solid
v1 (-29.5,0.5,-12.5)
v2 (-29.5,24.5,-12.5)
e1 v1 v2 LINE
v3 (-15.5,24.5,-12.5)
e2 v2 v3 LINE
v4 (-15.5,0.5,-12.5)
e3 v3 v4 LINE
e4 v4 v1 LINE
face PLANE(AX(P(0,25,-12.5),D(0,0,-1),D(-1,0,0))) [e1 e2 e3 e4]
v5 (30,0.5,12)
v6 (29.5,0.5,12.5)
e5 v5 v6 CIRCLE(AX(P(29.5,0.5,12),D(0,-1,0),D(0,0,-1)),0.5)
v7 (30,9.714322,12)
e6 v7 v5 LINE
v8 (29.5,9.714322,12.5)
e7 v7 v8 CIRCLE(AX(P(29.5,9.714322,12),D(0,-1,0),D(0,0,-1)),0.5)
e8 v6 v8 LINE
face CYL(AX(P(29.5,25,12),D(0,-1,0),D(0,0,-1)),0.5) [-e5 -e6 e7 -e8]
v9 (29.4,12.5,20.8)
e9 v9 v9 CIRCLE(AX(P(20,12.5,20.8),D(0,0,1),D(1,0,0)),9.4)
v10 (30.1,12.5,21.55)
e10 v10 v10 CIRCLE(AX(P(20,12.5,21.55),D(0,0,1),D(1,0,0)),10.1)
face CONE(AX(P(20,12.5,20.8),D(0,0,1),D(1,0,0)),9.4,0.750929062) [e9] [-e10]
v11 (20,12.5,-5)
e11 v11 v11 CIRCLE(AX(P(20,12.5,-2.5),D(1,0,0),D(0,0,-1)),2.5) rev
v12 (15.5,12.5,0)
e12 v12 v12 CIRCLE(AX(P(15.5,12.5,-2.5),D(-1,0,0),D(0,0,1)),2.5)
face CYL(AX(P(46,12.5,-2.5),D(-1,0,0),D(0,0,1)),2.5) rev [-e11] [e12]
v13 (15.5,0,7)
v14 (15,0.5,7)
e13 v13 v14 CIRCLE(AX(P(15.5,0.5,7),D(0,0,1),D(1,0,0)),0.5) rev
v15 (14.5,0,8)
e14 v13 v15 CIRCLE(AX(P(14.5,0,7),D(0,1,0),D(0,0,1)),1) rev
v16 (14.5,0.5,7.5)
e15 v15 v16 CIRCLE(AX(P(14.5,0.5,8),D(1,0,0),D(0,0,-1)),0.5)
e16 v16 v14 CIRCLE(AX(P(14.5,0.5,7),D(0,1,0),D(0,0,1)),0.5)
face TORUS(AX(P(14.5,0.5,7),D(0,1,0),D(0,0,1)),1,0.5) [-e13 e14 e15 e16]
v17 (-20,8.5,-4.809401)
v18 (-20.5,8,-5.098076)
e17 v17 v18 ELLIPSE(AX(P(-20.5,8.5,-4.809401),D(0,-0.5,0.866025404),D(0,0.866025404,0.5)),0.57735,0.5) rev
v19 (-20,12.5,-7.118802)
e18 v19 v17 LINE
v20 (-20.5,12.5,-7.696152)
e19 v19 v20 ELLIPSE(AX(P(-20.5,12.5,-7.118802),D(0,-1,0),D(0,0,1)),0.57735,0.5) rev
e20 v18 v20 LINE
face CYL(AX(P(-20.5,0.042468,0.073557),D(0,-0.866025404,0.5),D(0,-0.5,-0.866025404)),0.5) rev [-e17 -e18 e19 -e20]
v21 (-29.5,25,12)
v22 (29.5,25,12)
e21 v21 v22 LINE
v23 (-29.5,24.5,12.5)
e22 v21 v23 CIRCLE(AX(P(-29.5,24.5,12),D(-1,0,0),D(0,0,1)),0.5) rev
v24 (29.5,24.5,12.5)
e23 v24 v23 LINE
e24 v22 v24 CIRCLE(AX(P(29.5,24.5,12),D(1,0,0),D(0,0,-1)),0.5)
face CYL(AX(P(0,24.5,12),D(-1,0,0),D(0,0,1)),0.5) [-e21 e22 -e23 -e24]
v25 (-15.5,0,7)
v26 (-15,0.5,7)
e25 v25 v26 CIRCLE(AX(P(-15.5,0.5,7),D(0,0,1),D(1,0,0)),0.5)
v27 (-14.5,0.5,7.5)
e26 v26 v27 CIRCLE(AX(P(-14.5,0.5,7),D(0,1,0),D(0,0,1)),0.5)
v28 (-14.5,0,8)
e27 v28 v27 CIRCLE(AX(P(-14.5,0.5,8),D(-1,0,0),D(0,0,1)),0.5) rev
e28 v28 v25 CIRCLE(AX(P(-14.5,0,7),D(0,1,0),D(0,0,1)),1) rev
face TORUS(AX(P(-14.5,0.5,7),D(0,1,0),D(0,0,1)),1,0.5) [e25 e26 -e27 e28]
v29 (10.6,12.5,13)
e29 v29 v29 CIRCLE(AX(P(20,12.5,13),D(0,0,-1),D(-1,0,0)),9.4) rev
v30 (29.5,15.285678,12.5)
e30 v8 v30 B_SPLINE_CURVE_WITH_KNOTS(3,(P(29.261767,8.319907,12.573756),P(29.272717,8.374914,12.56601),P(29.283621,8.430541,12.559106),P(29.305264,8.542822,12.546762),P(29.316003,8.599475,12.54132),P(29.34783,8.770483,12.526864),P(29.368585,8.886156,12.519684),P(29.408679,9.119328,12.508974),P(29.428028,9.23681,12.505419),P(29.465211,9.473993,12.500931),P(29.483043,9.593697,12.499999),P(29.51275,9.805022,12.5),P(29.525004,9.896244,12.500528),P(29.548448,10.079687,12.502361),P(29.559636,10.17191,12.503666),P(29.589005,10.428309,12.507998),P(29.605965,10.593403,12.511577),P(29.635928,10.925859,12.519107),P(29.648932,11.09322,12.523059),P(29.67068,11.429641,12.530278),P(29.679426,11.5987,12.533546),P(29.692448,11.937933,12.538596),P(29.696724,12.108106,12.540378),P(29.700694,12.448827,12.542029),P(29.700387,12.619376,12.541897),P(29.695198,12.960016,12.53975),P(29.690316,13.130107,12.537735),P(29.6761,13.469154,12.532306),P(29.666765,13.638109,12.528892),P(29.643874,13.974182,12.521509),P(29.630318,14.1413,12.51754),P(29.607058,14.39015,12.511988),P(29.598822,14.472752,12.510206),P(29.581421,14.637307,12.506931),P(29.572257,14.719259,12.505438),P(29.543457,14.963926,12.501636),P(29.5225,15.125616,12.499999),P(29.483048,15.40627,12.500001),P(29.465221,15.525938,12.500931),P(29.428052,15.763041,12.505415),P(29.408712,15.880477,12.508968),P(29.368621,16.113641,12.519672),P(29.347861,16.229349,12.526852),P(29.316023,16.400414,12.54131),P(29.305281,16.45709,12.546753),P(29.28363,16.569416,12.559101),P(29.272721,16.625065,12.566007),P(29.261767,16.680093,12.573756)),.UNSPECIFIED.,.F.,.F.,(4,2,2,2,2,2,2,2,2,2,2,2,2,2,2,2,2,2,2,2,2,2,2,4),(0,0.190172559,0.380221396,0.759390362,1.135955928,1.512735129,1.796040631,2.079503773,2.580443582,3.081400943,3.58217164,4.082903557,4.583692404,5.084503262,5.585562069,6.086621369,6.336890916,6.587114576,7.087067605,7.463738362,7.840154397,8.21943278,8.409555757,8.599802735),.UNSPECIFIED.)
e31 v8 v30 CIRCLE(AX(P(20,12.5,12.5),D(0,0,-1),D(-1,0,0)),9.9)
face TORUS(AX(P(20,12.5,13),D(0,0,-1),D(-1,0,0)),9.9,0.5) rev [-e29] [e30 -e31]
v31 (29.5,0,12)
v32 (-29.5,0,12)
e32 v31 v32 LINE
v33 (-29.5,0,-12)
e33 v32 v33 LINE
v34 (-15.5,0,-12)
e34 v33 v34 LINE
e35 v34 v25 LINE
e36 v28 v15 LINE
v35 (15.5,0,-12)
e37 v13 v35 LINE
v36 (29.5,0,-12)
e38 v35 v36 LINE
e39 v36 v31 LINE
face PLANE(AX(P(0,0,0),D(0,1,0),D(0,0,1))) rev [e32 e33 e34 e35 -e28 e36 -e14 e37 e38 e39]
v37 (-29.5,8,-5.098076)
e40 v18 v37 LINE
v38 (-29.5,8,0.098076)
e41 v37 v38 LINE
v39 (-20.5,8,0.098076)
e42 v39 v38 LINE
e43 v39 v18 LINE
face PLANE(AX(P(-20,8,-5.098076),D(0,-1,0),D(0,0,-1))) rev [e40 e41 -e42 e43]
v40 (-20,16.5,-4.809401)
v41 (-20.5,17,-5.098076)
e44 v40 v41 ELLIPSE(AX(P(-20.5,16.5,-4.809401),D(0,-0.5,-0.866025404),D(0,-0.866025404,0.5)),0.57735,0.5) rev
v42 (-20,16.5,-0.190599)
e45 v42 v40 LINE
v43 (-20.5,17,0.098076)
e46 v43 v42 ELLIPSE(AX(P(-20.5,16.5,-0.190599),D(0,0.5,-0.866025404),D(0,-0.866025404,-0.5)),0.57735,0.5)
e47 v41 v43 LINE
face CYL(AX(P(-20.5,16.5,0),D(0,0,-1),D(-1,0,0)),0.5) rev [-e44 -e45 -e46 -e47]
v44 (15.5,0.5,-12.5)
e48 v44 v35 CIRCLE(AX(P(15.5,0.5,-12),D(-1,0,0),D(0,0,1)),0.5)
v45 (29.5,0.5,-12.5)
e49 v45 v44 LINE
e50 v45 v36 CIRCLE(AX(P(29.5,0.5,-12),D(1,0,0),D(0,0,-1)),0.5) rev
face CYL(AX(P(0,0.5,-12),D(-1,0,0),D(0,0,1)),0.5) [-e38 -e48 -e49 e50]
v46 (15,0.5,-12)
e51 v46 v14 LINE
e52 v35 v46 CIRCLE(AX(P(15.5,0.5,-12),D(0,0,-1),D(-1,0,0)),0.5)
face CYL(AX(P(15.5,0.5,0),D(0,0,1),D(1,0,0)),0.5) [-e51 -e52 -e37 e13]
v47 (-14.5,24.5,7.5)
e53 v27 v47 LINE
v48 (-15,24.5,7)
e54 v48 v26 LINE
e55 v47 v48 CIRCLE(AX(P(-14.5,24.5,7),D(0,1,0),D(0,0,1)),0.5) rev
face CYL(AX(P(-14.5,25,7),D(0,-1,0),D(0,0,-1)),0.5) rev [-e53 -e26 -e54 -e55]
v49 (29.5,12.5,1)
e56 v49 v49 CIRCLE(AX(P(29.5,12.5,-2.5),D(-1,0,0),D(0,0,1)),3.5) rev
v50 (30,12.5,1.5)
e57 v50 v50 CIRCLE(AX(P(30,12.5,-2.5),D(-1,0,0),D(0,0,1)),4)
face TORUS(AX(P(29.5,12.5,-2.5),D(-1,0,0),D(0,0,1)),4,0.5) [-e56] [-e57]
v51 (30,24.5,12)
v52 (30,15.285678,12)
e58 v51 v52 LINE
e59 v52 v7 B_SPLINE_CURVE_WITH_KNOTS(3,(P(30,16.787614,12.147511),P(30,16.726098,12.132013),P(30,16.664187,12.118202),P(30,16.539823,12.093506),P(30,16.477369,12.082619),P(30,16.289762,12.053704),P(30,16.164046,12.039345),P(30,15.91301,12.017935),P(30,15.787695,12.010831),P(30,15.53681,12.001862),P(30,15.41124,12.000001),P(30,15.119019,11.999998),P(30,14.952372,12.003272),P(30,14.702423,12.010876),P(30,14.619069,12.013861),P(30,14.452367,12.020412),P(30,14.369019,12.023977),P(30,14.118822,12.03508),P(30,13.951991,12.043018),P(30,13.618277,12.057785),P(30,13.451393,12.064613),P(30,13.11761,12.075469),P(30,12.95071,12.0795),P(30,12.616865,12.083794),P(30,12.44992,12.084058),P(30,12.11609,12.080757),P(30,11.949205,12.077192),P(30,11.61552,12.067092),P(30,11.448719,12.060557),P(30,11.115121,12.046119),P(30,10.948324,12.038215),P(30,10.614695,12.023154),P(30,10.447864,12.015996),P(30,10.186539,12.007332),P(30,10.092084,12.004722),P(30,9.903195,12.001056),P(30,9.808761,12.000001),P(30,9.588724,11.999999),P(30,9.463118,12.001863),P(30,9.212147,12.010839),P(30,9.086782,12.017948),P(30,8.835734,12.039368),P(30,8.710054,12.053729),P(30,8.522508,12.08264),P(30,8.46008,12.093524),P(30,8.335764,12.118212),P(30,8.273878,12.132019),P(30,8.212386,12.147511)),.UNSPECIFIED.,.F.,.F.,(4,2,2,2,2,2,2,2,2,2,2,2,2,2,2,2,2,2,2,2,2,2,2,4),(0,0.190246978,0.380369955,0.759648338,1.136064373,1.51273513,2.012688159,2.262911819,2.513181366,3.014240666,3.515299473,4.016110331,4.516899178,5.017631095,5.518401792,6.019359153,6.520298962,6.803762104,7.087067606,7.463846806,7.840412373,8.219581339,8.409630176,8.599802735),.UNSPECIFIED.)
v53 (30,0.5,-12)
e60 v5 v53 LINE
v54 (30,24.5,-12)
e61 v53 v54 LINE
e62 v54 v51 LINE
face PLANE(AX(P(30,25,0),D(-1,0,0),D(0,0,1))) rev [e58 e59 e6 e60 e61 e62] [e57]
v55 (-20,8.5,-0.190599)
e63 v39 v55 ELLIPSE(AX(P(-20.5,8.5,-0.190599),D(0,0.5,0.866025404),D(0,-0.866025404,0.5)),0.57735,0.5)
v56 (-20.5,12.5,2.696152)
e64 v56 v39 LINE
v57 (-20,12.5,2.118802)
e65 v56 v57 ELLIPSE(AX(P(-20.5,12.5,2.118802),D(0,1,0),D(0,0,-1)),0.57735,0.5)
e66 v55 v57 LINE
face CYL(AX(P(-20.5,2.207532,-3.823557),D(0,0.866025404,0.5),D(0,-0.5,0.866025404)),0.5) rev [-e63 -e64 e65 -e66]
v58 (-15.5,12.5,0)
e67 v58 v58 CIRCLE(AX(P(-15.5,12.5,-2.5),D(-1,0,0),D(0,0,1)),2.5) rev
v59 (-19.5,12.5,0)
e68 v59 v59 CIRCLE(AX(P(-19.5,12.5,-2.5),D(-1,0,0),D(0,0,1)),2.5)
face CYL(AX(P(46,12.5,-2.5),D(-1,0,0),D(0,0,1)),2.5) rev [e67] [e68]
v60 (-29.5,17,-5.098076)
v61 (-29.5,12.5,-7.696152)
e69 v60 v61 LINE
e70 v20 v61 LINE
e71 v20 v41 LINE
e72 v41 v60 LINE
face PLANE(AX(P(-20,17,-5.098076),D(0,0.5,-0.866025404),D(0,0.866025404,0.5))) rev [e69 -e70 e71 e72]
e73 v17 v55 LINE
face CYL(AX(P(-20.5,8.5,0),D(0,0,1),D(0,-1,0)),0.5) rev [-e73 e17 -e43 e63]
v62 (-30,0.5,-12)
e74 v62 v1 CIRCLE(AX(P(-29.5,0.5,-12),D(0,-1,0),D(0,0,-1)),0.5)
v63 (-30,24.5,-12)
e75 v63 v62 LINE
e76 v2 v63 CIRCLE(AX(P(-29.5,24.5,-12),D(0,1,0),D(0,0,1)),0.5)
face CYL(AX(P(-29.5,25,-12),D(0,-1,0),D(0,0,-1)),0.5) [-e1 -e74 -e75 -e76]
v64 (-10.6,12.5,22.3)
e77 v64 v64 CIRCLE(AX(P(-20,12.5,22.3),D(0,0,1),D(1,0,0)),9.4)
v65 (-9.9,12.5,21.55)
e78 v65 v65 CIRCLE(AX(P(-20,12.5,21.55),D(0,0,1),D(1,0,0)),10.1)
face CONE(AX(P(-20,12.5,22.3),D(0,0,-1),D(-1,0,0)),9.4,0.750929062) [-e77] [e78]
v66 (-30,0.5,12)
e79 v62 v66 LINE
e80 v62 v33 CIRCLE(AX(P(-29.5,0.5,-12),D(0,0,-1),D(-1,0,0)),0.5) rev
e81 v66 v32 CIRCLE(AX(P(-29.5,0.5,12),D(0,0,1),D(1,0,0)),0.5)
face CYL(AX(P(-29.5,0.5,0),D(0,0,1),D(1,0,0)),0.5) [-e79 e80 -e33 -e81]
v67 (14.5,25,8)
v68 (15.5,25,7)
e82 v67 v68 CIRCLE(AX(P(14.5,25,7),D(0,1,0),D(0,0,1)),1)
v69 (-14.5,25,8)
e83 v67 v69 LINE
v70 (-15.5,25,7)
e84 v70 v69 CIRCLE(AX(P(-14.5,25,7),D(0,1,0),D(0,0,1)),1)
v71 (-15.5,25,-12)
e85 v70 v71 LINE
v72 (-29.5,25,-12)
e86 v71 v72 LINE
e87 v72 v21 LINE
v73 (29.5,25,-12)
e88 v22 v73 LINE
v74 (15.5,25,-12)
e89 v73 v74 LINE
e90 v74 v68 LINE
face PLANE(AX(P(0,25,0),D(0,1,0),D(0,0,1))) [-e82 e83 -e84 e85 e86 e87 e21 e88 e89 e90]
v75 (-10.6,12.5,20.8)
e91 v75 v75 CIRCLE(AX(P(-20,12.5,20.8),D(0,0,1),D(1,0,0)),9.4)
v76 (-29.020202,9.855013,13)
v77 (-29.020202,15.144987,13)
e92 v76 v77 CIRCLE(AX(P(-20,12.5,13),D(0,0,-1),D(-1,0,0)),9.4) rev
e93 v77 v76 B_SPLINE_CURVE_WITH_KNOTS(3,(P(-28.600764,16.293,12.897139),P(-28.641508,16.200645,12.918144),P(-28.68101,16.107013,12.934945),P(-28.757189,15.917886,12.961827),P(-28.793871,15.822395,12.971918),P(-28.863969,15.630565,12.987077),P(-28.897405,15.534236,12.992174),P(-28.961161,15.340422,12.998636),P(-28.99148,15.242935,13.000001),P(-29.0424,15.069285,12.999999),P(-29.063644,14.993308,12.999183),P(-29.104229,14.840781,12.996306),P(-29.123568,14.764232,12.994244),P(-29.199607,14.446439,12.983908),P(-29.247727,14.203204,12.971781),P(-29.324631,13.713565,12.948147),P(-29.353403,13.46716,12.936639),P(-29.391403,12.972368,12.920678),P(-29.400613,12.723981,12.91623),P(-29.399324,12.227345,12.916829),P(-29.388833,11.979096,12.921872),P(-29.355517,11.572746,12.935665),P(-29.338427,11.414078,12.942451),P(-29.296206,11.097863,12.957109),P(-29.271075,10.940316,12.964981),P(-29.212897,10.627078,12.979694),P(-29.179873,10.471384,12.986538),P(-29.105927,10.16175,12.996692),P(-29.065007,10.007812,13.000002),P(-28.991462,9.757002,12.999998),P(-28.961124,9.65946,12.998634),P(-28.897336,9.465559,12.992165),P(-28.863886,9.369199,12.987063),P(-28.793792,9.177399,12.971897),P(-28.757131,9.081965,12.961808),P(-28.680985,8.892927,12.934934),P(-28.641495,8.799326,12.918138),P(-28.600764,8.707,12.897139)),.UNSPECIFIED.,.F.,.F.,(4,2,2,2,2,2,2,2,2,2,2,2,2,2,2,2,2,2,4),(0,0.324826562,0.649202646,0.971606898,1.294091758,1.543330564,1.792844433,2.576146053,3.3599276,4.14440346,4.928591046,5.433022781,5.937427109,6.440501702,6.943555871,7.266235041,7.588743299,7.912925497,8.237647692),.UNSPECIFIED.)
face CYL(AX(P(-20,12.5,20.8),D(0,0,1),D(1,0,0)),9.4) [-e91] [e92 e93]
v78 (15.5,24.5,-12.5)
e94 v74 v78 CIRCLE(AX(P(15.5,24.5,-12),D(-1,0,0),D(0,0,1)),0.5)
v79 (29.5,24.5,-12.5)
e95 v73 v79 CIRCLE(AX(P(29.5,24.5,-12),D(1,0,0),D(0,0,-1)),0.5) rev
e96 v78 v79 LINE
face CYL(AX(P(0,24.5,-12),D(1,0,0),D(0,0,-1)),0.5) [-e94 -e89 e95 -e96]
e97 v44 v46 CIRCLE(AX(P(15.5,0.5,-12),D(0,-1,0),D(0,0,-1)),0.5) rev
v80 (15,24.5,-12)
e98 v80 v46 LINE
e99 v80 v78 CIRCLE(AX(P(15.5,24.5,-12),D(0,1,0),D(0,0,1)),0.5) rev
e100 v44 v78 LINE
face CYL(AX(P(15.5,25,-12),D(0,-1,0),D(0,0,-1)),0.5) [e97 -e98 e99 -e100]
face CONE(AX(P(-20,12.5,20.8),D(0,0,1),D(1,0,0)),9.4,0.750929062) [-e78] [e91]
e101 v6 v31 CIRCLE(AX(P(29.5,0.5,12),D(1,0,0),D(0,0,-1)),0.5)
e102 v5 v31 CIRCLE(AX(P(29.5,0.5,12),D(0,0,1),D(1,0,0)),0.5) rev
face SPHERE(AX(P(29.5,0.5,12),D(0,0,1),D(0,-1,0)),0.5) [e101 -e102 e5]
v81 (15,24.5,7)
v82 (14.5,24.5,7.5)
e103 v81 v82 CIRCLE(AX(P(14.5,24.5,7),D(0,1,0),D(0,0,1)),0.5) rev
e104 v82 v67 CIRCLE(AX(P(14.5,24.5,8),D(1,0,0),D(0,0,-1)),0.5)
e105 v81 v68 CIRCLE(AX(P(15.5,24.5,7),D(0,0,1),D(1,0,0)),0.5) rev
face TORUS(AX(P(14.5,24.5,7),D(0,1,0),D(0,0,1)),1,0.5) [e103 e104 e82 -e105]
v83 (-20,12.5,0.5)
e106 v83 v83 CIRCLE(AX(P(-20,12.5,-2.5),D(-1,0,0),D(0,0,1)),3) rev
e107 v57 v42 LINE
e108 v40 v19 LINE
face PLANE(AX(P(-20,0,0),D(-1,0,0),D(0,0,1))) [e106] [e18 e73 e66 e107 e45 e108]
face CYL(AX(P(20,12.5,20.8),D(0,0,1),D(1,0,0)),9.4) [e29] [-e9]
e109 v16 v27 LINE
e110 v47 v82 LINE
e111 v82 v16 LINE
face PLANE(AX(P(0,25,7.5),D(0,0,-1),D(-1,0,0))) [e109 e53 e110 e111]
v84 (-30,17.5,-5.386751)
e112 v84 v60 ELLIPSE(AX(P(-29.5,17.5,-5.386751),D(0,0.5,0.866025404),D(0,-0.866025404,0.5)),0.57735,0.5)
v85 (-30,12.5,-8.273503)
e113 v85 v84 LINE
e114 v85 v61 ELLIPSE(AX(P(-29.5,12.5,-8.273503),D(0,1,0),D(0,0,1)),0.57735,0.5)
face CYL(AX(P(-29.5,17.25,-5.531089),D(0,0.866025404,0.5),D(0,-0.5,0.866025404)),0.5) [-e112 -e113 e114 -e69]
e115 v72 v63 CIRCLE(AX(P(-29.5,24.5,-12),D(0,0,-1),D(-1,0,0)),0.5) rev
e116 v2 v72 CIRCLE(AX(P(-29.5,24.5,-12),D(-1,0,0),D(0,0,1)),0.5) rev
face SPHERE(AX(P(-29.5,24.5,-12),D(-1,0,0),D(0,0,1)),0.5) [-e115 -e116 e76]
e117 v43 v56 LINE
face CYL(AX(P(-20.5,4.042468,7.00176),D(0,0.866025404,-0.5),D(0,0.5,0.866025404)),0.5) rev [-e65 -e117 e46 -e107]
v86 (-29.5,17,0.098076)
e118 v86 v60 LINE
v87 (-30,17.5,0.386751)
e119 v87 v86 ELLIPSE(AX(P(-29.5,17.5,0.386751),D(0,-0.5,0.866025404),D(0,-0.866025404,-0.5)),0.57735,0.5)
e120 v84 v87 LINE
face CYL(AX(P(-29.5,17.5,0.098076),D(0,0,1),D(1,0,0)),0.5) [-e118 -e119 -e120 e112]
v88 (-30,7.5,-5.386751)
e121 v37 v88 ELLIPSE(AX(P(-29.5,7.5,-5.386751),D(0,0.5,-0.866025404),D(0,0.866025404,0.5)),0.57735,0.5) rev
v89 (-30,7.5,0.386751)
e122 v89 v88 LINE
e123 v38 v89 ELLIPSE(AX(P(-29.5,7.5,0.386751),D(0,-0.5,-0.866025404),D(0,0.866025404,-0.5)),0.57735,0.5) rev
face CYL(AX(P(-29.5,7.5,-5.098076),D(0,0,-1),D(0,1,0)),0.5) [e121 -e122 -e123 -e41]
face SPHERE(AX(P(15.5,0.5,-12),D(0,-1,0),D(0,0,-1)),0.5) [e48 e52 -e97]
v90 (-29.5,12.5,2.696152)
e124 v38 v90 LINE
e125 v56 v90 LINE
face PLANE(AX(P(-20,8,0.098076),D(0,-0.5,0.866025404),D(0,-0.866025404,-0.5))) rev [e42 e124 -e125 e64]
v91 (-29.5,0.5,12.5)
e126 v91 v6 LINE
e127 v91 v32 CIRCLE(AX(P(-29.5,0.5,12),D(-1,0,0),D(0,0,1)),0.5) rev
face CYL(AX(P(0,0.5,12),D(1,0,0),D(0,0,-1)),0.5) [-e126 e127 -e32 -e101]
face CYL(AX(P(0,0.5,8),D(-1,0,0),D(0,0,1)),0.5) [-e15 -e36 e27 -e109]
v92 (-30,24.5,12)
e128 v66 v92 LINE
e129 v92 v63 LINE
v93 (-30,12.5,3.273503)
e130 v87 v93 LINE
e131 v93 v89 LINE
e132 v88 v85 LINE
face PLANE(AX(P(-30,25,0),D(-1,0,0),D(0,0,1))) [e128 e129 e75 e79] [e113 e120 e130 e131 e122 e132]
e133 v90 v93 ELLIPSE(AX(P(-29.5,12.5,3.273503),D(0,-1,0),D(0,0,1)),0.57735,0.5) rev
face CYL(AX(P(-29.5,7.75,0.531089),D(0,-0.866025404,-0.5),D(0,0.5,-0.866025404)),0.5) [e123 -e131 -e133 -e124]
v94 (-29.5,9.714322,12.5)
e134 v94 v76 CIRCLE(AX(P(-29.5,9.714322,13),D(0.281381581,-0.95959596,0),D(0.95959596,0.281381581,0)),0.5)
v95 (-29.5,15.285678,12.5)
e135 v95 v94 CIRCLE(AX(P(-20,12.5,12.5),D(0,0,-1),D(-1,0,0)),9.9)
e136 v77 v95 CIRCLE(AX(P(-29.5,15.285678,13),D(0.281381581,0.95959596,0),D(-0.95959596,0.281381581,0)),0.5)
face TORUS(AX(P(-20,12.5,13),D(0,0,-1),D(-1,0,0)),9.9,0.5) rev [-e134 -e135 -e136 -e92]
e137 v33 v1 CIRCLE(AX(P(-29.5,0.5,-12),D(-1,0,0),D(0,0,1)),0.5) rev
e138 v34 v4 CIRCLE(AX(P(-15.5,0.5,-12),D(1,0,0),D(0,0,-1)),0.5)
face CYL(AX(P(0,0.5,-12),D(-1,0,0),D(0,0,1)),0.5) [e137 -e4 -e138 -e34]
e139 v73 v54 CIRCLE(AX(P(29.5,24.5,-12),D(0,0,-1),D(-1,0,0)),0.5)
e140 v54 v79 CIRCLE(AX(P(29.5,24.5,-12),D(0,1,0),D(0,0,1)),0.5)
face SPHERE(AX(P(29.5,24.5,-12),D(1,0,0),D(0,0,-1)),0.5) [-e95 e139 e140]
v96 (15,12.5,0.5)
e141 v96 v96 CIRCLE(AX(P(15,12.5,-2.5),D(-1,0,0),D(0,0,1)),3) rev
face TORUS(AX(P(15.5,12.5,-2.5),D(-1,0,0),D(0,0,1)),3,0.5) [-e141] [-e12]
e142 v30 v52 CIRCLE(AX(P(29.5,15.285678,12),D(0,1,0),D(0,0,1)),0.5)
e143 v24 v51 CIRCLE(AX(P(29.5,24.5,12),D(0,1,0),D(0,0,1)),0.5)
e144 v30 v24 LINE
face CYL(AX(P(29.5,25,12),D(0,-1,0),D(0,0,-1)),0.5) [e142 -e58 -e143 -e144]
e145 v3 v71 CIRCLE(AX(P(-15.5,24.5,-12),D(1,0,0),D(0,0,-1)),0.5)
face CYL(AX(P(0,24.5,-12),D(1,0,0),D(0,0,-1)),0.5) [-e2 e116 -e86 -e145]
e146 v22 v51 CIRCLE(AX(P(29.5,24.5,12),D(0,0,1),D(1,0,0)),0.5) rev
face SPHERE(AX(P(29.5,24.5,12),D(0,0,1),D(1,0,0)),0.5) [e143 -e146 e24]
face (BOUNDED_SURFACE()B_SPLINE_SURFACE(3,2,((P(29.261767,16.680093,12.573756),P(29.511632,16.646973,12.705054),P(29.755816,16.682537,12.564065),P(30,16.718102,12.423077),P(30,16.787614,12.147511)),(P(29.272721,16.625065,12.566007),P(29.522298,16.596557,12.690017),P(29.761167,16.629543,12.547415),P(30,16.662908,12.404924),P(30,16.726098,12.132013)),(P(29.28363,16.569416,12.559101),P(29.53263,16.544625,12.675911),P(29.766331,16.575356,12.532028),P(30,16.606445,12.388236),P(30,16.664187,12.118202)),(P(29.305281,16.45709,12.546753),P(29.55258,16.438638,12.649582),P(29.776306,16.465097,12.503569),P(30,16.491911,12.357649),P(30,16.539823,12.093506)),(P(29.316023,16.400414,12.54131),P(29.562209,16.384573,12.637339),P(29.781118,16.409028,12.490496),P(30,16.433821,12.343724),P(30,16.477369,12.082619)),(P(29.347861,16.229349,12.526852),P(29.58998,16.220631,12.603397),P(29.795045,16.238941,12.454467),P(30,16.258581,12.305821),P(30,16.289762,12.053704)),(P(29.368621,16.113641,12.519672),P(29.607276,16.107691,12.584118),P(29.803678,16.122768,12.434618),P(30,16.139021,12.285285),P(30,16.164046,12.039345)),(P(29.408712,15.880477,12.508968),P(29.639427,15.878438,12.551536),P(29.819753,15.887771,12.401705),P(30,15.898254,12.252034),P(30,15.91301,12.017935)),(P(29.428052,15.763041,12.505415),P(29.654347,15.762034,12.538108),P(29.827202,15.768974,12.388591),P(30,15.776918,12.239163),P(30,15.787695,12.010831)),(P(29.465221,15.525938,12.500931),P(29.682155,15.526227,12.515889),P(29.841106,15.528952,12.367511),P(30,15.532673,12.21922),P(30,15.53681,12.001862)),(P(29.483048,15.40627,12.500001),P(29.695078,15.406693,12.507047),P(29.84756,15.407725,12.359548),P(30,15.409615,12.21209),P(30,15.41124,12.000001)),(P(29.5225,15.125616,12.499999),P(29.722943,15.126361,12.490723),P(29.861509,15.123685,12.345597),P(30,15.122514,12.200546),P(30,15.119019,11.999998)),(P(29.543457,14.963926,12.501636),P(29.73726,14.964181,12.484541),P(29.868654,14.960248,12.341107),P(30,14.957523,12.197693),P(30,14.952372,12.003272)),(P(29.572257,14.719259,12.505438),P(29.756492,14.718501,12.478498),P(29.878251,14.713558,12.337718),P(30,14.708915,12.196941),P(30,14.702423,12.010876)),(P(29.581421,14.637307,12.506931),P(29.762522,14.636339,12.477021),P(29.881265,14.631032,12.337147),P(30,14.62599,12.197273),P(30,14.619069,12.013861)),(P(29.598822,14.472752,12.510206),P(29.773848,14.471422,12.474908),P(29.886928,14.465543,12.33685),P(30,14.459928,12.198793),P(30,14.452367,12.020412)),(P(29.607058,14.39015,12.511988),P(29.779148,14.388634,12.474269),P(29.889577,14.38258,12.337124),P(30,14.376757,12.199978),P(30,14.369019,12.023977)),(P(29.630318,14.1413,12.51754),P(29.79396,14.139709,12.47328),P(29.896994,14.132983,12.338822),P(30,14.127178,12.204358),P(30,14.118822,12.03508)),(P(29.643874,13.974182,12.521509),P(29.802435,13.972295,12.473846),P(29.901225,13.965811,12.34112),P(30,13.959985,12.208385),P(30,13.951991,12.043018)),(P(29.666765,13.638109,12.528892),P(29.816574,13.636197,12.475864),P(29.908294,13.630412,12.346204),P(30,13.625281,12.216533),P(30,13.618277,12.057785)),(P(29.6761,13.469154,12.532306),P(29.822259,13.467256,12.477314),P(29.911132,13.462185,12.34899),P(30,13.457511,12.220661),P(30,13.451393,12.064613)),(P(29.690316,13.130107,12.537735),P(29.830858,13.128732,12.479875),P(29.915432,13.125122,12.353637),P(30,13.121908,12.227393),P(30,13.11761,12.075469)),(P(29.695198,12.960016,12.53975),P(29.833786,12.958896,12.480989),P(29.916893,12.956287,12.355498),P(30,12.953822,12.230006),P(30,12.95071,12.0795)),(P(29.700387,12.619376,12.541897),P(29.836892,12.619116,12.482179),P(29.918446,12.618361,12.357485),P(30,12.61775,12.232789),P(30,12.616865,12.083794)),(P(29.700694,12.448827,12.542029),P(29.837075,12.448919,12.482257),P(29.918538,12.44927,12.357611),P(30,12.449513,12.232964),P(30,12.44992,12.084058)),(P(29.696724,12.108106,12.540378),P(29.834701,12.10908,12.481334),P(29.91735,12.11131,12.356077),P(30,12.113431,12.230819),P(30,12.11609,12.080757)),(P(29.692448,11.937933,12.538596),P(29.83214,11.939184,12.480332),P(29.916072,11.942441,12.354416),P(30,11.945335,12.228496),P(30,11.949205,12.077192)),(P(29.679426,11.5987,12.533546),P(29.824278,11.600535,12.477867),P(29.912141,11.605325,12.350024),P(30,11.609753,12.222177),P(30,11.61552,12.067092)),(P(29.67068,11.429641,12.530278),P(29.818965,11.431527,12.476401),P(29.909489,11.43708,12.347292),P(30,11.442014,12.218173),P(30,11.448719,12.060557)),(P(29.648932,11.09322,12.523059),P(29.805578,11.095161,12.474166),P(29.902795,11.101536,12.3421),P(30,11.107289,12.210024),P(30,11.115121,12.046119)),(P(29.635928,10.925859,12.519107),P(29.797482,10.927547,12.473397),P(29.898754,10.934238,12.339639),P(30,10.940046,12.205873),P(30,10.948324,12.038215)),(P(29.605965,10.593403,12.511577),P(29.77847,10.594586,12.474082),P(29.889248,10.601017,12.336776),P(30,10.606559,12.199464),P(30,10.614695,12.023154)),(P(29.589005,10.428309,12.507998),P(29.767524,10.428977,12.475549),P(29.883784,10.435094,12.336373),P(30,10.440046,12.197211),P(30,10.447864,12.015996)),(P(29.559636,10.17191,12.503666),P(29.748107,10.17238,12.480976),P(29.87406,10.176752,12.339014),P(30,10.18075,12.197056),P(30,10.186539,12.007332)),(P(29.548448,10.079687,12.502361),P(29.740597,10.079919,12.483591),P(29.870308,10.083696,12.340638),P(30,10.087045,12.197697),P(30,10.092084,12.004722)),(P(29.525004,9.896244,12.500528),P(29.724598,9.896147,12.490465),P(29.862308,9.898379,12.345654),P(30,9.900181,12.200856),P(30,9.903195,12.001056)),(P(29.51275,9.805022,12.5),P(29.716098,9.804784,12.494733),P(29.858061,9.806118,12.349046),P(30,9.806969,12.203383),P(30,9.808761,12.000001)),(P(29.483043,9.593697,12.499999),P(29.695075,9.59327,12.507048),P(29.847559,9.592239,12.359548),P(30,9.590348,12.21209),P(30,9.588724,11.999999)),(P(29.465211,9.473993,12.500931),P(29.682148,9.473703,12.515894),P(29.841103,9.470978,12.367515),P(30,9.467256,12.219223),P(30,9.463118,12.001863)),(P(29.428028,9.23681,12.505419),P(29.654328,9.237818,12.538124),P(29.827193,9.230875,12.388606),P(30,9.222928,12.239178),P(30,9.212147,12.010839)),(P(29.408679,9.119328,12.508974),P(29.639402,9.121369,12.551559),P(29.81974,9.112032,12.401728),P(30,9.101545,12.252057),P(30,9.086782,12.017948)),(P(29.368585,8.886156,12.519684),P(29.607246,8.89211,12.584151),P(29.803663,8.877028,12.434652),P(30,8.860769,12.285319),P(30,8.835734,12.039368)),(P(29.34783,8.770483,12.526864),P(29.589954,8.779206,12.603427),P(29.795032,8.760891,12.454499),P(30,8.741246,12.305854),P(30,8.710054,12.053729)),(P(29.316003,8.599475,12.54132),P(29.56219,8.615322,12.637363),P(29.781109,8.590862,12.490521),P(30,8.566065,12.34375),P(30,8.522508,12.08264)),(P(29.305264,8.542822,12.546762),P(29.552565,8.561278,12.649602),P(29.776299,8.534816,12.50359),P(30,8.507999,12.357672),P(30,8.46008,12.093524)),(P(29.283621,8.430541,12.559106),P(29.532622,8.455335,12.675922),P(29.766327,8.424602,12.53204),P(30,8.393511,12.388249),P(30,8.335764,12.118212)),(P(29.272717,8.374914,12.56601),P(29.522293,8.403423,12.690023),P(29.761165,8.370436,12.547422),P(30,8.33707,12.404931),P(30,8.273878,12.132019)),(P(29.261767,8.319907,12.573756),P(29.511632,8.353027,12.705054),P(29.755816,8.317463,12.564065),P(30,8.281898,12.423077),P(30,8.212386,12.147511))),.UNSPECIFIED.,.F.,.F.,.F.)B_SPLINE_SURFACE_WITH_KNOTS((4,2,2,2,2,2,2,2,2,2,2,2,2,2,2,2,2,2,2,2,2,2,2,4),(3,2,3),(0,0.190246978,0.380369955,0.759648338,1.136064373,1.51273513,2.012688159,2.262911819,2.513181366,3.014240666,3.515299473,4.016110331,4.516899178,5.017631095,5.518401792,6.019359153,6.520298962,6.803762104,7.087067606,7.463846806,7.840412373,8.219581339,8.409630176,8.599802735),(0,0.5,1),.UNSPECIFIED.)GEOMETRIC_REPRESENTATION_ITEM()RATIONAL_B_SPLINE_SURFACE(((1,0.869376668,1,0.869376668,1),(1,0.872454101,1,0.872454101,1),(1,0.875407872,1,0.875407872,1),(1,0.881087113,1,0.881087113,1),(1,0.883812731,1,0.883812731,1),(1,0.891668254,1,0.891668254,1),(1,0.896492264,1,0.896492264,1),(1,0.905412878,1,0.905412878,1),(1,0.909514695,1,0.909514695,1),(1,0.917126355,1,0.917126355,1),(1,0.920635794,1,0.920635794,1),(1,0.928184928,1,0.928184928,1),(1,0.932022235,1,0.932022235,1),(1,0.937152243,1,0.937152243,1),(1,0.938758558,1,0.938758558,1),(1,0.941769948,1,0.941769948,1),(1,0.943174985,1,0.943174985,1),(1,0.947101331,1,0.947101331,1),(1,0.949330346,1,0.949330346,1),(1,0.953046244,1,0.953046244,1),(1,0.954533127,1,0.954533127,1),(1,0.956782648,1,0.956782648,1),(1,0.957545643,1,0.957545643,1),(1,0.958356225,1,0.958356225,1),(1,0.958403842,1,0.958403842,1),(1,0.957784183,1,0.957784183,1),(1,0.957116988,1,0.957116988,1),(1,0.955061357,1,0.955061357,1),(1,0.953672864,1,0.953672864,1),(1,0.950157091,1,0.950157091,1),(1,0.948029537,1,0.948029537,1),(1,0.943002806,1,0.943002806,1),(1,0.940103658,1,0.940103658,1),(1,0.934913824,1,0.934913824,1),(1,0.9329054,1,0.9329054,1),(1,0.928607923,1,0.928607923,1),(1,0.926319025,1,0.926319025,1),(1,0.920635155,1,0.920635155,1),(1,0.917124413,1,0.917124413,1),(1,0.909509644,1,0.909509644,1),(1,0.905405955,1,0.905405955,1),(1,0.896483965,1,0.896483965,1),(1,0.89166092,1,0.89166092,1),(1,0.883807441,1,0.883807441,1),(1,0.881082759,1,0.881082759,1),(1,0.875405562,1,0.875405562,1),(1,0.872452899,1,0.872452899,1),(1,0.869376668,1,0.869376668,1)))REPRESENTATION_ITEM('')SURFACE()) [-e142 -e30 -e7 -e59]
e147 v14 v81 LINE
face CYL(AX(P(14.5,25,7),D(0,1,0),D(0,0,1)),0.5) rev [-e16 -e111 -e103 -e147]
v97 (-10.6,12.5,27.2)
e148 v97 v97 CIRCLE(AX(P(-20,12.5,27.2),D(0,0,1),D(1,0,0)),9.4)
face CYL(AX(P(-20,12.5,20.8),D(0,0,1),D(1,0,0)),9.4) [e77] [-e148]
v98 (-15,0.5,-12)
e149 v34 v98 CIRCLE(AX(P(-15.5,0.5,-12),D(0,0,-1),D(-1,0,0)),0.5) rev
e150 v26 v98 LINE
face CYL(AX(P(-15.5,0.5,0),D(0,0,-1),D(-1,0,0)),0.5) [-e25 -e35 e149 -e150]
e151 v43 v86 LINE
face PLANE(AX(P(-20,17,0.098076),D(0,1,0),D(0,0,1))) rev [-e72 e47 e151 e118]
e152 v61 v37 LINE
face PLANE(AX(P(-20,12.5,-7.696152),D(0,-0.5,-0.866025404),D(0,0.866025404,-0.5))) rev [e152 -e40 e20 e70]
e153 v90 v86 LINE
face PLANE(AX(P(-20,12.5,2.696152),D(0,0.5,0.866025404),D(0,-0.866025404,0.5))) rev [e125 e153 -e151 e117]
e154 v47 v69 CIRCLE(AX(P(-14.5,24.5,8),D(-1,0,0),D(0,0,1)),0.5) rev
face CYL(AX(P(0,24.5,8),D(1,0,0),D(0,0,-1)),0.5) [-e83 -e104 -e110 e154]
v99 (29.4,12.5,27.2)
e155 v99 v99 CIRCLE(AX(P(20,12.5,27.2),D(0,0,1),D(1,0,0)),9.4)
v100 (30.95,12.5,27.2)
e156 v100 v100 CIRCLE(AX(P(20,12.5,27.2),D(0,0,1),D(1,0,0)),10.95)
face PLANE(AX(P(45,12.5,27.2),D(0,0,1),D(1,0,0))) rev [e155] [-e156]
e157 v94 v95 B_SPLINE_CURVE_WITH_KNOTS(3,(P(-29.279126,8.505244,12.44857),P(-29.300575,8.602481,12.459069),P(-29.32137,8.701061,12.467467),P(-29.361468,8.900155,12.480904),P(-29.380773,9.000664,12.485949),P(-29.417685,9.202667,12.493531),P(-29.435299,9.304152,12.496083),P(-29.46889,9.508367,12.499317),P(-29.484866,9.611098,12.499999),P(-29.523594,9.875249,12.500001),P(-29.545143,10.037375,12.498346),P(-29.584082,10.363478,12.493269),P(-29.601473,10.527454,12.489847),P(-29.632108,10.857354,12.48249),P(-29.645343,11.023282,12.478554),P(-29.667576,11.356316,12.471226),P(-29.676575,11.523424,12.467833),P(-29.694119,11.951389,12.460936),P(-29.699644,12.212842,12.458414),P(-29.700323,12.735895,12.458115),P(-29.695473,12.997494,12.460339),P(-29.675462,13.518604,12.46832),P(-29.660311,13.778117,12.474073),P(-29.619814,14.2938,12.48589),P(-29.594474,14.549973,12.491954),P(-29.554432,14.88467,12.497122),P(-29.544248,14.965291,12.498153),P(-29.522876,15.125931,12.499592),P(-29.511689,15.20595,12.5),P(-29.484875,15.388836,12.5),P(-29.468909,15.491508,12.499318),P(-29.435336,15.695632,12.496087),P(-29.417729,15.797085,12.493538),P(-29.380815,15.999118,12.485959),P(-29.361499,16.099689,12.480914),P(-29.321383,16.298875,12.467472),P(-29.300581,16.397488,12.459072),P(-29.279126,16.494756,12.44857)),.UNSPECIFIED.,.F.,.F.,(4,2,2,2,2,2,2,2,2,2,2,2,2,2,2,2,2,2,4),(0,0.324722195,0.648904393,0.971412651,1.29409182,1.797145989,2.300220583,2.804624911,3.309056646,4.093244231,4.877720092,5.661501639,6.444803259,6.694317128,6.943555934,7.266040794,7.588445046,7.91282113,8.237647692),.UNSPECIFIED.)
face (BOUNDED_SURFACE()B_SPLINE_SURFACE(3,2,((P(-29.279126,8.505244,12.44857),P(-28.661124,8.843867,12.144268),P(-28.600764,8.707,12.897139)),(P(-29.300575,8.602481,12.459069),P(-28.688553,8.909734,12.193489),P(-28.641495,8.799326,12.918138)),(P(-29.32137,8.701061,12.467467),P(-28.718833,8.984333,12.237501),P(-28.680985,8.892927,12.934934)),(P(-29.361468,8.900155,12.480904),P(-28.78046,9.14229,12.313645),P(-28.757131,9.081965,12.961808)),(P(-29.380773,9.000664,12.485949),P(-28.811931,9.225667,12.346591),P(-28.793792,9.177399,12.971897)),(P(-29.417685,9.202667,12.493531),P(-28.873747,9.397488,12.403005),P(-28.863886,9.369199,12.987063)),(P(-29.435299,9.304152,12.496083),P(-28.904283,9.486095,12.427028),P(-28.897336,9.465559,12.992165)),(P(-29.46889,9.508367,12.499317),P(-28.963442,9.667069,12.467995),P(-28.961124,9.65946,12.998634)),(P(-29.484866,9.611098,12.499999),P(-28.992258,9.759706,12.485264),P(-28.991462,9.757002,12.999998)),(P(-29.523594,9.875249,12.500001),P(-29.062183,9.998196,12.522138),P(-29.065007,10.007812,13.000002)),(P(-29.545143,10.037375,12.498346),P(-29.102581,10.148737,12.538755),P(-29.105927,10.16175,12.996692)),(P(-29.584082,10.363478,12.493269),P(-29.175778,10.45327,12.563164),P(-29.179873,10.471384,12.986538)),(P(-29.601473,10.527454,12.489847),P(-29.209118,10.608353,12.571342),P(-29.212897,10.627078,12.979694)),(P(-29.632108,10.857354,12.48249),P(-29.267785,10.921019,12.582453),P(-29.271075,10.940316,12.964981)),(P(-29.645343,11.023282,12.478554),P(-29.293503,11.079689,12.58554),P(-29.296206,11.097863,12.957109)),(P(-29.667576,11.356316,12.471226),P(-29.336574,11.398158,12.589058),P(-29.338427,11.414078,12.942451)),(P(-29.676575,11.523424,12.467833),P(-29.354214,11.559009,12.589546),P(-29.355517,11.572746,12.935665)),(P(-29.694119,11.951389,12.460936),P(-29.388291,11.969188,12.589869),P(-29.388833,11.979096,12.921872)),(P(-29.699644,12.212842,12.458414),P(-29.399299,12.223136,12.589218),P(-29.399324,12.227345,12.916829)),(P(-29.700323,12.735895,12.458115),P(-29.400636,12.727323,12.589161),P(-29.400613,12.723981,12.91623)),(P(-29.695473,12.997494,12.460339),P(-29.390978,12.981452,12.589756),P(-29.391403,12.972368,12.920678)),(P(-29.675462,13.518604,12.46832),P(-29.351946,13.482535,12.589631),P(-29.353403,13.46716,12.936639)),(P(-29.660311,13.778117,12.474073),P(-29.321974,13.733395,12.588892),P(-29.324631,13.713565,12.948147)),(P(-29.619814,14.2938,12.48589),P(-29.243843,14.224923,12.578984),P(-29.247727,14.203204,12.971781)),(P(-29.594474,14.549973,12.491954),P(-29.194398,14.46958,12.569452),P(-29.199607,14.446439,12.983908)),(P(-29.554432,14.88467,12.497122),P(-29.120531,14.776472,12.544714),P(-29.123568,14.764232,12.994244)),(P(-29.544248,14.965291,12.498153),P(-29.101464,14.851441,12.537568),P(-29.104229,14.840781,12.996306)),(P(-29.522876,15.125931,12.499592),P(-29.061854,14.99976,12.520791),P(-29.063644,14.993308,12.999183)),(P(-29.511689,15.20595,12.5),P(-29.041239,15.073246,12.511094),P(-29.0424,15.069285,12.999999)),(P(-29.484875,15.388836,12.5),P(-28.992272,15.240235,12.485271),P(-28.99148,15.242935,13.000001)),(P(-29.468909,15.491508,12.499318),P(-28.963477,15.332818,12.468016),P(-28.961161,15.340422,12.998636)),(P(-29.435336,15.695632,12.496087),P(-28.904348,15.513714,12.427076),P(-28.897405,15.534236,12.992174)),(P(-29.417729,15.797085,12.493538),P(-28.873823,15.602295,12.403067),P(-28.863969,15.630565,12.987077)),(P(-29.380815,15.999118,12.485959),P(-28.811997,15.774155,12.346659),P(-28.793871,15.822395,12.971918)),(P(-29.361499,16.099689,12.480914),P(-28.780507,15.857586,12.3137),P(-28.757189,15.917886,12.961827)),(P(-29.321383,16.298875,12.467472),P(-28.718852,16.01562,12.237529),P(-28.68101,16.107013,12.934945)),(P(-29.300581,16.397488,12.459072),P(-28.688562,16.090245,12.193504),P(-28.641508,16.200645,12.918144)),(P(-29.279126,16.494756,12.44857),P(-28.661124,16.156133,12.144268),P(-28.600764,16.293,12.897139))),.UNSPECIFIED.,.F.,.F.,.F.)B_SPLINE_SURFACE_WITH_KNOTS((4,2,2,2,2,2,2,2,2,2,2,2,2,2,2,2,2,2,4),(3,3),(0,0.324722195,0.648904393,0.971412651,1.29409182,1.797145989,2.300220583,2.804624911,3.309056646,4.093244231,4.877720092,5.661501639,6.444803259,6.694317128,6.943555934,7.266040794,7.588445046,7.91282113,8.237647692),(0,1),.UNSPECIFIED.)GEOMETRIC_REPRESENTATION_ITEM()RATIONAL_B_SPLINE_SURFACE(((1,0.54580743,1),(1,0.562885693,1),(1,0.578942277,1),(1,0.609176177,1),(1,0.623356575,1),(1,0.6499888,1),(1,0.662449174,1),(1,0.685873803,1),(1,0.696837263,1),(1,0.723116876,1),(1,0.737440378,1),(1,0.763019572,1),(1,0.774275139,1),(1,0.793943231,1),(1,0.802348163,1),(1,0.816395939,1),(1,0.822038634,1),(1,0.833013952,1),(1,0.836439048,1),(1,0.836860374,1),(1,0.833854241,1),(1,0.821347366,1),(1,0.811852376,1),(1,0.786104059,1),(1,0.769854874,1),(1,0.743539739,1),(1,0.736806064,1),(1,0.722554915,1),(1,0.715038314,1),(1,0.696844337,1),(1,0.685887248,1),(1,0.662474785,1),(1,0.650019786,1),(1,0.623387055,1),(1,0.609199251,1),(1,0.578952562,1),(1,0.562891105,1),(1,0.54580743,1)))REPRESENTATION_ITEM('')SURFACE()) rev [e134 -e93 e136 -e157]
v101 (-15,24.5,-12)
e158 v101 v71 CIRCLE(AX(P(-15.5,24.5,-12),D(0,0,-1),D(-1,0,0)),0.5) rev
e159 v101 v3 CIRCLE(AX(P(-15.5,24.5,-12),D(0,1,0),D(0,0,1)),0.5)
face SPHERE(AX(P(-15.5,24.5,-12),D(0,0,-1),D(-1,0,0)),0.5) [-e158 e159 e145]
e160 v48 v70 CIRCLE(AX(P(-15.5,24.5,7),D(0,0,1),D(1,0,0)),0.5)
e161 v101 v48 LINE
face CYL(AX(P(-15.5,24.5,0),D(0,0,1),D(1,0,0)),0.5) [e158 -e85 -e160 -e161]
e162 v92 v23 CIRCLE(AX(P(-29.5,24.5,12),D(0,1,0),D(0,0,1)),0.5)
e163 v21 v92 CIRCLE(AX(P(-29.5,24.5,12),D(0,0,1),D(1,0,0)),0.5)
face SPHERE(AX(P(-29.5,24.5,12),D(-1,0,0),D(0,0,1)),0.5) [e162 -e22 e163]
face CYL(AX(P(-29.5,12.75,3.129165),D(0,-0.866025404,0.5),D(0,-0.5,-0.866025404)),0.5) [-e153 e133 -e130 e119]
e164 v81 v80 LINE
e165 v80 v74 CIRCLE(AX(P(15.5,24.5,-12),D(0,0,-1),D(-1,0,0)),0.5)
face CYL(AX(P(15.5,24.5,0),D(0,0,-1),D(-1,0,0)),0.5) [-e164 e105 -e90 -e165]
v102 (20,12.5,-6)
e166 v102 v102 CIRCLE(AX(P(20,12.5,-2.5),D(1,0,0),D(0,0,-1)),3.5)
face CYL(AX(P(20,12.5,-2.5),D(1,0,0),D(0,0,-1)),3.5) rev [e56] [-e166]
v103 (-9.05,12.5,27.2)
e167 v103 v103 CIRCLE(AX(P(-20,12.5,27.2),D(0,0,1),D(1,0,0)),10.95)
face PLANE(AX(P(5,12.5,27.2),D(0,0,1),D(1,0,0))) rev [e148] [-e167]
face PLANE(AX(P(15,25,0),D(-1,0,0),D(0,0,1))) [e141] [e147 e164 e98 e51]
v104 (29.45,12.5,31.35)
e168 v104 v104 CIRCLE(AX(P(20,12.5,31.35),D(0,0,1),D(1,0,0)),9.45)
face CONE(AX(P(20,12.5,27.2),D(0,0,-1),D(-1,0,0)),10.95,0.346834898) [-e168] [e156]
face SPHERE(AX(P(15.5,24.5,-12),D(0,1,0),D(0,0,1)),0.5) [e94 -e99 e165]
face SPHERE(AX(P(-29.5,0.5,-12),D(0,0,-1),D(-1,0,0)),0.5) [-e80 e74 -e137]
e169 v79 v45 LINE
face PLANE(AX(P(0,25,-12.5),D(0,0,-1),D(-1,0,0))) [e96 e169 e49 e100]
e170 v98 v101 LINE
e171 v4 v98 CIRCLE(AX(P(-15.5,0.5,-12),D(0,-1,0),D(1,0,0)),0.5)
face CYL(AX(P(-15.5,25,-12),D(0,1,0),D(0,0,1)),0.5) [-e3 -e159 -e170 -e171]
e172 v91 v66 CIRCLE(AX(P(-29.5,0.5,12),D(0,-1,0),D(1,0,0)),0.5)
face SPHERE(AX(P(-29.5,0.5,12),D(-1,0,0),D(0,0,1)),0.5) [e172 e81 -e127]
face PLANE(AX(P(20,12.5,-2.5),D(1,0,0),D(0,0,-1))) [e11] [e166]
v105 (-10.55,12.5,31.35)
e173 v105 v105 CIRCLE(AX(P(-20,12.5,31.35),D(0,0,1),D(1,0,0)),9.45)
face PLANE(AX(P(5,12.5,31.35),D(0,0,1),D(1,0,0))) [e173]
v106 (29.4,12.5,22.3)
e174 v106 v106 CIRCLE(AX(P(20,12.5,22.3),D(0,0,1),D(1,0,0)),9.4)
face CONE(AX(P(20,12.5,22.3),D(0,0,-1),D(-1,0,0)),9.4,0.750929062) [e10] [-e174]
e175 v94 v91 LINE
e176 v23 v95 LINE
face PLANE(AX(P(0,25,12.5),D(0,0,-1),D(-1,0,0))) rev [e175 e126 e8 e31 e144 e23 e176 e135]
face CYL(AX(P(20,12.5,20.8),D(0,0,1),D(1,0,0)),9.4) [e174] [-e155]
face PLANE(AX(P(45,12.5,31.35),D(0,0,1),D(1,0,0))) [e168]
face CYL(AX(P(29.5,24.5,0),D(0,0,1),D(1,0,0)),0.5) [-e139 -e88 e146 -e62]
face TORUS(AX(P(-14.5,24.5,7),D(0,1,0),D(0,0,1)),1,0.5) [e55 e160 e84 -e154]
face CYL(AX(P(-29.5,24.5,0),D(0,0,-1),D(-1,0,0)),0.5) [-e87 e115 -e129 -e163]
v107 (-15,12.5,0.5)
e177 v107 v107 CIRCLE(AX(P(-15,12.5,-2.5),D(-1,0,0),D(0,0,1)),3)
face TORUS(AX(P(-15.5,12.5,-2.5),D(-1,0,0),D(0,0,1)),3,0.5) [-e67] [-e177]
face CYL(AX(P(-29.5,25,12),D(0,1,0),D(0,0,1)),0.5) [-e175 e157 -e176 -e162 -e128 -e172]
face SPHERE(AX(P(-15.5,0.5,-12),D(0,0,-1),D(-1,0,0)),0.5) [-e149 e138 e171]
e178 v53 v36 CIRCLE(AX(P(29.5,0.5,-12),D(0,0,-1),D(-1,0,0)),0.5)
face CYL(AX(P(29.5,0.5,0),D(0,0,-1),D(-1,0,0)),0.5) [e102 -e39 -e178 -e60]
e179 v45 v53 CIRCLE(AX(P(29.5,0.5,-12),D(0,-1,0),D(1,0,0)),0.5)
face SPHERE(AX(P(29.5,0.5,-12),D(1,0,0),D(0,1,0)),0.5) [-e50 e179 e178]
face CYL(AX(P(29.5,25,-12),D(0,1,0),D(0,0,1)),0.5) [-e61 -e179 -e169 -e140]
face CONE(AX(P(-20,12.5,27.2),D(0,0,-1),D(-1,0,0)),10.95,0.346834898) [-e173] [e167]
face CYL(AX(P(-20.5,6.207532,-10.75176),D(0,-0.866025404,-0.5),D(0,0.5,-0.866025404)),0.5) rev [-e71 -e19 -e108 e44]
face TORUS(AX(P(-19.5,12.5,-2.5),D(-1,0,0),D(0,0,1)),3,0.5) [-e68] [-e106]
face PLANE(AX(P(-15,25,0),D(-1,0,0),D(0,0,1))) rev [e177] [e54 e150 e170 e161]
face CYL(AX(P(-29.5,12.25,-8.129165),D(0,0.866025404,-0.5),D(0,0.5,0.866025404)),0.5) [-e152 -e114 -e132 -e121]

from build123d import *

# Parameters (mm, degrees)
BOSS_EXTRUDE1_DEPTH = 25
SKETCH2_R           = 2.5
CUT_EXTRUDE1_DEPTH  = 76
SKETCH6_W           = 9.4
SKETCH6_H           = 6.5
SKETCH6_H_2         = 4.9
SKETCH6_H_3         = 0.75
SKETCH6_H_4         = 1.8
FILLET2_R           = 0.5
FILLET3_R           = 0.5
FILLET4_R           = 0.5
CUT_EXTRUDE2_DEPTH  = 10
SKETCH10_R          = 3.5
CUT_EXTRUDE3_DEPTH  = 10
FILLET5_R           = 0.5


with BuildPart() as part:
    # Sketch1 → Boss-Extrude1 (new body)
    with BuildSketch(Plane(origin=(0, 0, 0), x_dir=(1, 0, 0), z_dir=(0, 1, 0))):
        Polygon((-30, 12.5), (-30, -12.5), (30, -12.5), (30, 12.5), (15, 12.5), (15, -7.5), (-15, -7.5), (-15, 12.5), align=None)
    extrude(amount=BOSS_EXTRUDE1_DEPTH)

    # Sketch2 → Cut-Extrude1 (cut)
    with BuildSketch(Plane.ZY.offset(30)):
        with Locations((-2.5, 12.5)):
            Circle(SKETCH2_R)
    extrude(amount=-CUT_EXTRUDE1_DEPTH, mode=Mode.SUBTRACT)

    # Sketch6 → Revolve1 (revolve)
    with BuildSketch(Plane(origin=(0, 25, 0), x_dir=(1, 0, 0), z_dir=(0, 1, 0))):
        with Locations((-20.3, -17.55)):
            Rectangle(SKETCH6_W, SKETCH6_H)
        with Locations((-20.3, -24.75)):
            Rectangle(SKETCH6_W, SKETCH6_H_2)
        Polygon((-14.05, -27.2), (-15.55, -31.35), (-25, -31.35), (-25, -27.2), align=None)
        with Locations((-20.3, -21.175)):
            Rectangle(SKETCH6_W, SKETCH6_H_3)
        with Locations((-20.3, -21.925)):
            Rectangle(SKETCH6_W, SKETCH6_H_3)
        Polygon((-15.6, -22.3), (-14.9, -21.55), (-15.6, -21.55), align=None)
        Polygon((-14.9, -21.55), (-15.6, -20.8), (-15.6, -21.55), align=None)
        with Locations((-20.3, -13.4)):
            Rectangle(SKETCH6_W, SKETCH6_H_4)
    revolve(axis=Axis((-25, 25, 20.8), (0, 0, -1)))


with BuildPart() as body_2:
    # Split1: read off the stored shape, not the designer's step
    # Split1: the piece on the far side of the plane
    add(part.part)
    split(bisect_by=Plane.XY.offset(12.5), keep=Keep.BOTTOM)


with BuildPart() as part_1:
    add(part.part)

    # Split1
    split(bisect_by=Plane.XY.offset(12.5), keep=Keep.TOP)


with BuildPart() as part_2:
    # Body-Move/Copy1: moved
    add(part_1.part.moved(Location((0, -10, 0))))


with BuildPart() as body_3:
    # Body-Move/Copy2: copy of part
    add(part_2.part.moved(Location((30, 0, 0))))


with BuildPart() as body_3_1:
    # Body-Move/Copy3: read off the stored shape, not the designer's step
    # Body-Move/Copy3: moved
    add(body_3.part.moved(Location((15, -2.5, 0))))


with BuildPart() as part_3:
    # Body-Move/Copy4: read off the stored shape, not the designer's step
    # Body-Move/Copy4: moved
    add(part_2.part.moved(Location((5, -2.5, 0))))


with BuildPart() as body_3_2:
    add(body_3_1.part)

    # Combine1: union body 2, part
    add(body_2.part)
    add(part_3.part)

    # Fillet2
    fillet2_edges = [body_3_2.edges().sort_by_distance(p)[0] for p in [
        (10.6, 12.5, 12.5),
    ]]
    fillet(fillet2_edges, radius=FILLET2_R)

    # Fillet3
    fillet3_edges = [body_3_2.edges().sort_by_distance(p)[0] for p in [
        (22.5, 25, -12.5),
        (30, 12.5, -12.5),
        (30, 12.5, -5),
        (30, 0, 0),
        (30, 12.5, 12.5),
        (-15, 12.5, -5),
        (-15, 0, -2.5),
        (-15, 12.5, 7.5),
        (0, 25, 7.5),
        (15, 12.5, 7.5),
        (15, 25, -2.5),
        (15, 12.5, -12.5),
        (-22.5, 25, -12.5),
        (-15, 12.5, -12.5),
        (-15, 25, -2.5),
        (0, 25, 12.5),
        (30, 25, 0),
        (15, 0, -2.5),
        (22.5, 0, -12.5),
        (-30, 0, 0),
        (-22.5, 0, -12.5),
        (0, 0, 7.5),
        (-30, 12.5, -5),
        (-30, 25, 0),
        (-30, 12.5, -12.5),
        (-30, 12.5, 12.5),
        (0, 0, 12.5),
    ]]
    fillet(fillet3_edges, radius=FILLET3_R)

    # Fillet4
    fillet4_edges = [body_3_2.edges().sort_by_distance(p)[0] for p in [
        (-29.4, 12.5, 12.5),
    ]]
    fillet(fillet4_edges, radius=FILLET4_R)

    # Sketch9 → Cut-Extrude2 (cut)
    with BuildSketch(Plane.ZY.offset(30)):
        Polygon((2.696152423, 12.5), (0.098076211, 17), (-5.098076211, 17), (-7.696152423, 12.5), (-5.098076211, 8), (0.098076211, 8), align=None)
    extrude(amount=-CUT_EXTRUDE2_DEPTH, mode=Mode.SUBTRACT)

    # Sketch10 → Cut-Extrude3 (cut)
    with BuildSketch(Plane(origin=(30, 0, 0), x_dir=(0, 0, -1), z_dir=(1, 0, 0))):
        with Locations((2.5, 12.5)):
            Circle(SKETCH10_R)
    extrude(amount=-CUT_EXTRUDE3_DEPTH, mode=Mode.SUBTRACT)

    # Fillet5
    fillet5_edges = [body_3_2.edges().sort_by_distance(p)[0] for p in [
        (-30, 10.25, 1.397114317),
        (-30, 14.75, 1.397114317),
        (-30, 17, -2.5),
        (-30, 14.75, -6.397114317),
        (-30, 10.25, -6.397114317),
        (-30, 8, -2.5),
        (-20, 10.25, 1.397114317),
        (-20, 8, -2.5),
        (-20, 10.25, -6.397114317),
        (-20, 14.75, -6.397114317),
        (-20, 17, -2.5),
        (-20, 14.75, 1.397114317),
        (-20, 12.5, -5),
        (30, 12.5, 1),
        (15, 12.5, -5),
    ]]
    fillet(fillet5_edges, radius=FILLET5_R)


solid = body_3_2.part
